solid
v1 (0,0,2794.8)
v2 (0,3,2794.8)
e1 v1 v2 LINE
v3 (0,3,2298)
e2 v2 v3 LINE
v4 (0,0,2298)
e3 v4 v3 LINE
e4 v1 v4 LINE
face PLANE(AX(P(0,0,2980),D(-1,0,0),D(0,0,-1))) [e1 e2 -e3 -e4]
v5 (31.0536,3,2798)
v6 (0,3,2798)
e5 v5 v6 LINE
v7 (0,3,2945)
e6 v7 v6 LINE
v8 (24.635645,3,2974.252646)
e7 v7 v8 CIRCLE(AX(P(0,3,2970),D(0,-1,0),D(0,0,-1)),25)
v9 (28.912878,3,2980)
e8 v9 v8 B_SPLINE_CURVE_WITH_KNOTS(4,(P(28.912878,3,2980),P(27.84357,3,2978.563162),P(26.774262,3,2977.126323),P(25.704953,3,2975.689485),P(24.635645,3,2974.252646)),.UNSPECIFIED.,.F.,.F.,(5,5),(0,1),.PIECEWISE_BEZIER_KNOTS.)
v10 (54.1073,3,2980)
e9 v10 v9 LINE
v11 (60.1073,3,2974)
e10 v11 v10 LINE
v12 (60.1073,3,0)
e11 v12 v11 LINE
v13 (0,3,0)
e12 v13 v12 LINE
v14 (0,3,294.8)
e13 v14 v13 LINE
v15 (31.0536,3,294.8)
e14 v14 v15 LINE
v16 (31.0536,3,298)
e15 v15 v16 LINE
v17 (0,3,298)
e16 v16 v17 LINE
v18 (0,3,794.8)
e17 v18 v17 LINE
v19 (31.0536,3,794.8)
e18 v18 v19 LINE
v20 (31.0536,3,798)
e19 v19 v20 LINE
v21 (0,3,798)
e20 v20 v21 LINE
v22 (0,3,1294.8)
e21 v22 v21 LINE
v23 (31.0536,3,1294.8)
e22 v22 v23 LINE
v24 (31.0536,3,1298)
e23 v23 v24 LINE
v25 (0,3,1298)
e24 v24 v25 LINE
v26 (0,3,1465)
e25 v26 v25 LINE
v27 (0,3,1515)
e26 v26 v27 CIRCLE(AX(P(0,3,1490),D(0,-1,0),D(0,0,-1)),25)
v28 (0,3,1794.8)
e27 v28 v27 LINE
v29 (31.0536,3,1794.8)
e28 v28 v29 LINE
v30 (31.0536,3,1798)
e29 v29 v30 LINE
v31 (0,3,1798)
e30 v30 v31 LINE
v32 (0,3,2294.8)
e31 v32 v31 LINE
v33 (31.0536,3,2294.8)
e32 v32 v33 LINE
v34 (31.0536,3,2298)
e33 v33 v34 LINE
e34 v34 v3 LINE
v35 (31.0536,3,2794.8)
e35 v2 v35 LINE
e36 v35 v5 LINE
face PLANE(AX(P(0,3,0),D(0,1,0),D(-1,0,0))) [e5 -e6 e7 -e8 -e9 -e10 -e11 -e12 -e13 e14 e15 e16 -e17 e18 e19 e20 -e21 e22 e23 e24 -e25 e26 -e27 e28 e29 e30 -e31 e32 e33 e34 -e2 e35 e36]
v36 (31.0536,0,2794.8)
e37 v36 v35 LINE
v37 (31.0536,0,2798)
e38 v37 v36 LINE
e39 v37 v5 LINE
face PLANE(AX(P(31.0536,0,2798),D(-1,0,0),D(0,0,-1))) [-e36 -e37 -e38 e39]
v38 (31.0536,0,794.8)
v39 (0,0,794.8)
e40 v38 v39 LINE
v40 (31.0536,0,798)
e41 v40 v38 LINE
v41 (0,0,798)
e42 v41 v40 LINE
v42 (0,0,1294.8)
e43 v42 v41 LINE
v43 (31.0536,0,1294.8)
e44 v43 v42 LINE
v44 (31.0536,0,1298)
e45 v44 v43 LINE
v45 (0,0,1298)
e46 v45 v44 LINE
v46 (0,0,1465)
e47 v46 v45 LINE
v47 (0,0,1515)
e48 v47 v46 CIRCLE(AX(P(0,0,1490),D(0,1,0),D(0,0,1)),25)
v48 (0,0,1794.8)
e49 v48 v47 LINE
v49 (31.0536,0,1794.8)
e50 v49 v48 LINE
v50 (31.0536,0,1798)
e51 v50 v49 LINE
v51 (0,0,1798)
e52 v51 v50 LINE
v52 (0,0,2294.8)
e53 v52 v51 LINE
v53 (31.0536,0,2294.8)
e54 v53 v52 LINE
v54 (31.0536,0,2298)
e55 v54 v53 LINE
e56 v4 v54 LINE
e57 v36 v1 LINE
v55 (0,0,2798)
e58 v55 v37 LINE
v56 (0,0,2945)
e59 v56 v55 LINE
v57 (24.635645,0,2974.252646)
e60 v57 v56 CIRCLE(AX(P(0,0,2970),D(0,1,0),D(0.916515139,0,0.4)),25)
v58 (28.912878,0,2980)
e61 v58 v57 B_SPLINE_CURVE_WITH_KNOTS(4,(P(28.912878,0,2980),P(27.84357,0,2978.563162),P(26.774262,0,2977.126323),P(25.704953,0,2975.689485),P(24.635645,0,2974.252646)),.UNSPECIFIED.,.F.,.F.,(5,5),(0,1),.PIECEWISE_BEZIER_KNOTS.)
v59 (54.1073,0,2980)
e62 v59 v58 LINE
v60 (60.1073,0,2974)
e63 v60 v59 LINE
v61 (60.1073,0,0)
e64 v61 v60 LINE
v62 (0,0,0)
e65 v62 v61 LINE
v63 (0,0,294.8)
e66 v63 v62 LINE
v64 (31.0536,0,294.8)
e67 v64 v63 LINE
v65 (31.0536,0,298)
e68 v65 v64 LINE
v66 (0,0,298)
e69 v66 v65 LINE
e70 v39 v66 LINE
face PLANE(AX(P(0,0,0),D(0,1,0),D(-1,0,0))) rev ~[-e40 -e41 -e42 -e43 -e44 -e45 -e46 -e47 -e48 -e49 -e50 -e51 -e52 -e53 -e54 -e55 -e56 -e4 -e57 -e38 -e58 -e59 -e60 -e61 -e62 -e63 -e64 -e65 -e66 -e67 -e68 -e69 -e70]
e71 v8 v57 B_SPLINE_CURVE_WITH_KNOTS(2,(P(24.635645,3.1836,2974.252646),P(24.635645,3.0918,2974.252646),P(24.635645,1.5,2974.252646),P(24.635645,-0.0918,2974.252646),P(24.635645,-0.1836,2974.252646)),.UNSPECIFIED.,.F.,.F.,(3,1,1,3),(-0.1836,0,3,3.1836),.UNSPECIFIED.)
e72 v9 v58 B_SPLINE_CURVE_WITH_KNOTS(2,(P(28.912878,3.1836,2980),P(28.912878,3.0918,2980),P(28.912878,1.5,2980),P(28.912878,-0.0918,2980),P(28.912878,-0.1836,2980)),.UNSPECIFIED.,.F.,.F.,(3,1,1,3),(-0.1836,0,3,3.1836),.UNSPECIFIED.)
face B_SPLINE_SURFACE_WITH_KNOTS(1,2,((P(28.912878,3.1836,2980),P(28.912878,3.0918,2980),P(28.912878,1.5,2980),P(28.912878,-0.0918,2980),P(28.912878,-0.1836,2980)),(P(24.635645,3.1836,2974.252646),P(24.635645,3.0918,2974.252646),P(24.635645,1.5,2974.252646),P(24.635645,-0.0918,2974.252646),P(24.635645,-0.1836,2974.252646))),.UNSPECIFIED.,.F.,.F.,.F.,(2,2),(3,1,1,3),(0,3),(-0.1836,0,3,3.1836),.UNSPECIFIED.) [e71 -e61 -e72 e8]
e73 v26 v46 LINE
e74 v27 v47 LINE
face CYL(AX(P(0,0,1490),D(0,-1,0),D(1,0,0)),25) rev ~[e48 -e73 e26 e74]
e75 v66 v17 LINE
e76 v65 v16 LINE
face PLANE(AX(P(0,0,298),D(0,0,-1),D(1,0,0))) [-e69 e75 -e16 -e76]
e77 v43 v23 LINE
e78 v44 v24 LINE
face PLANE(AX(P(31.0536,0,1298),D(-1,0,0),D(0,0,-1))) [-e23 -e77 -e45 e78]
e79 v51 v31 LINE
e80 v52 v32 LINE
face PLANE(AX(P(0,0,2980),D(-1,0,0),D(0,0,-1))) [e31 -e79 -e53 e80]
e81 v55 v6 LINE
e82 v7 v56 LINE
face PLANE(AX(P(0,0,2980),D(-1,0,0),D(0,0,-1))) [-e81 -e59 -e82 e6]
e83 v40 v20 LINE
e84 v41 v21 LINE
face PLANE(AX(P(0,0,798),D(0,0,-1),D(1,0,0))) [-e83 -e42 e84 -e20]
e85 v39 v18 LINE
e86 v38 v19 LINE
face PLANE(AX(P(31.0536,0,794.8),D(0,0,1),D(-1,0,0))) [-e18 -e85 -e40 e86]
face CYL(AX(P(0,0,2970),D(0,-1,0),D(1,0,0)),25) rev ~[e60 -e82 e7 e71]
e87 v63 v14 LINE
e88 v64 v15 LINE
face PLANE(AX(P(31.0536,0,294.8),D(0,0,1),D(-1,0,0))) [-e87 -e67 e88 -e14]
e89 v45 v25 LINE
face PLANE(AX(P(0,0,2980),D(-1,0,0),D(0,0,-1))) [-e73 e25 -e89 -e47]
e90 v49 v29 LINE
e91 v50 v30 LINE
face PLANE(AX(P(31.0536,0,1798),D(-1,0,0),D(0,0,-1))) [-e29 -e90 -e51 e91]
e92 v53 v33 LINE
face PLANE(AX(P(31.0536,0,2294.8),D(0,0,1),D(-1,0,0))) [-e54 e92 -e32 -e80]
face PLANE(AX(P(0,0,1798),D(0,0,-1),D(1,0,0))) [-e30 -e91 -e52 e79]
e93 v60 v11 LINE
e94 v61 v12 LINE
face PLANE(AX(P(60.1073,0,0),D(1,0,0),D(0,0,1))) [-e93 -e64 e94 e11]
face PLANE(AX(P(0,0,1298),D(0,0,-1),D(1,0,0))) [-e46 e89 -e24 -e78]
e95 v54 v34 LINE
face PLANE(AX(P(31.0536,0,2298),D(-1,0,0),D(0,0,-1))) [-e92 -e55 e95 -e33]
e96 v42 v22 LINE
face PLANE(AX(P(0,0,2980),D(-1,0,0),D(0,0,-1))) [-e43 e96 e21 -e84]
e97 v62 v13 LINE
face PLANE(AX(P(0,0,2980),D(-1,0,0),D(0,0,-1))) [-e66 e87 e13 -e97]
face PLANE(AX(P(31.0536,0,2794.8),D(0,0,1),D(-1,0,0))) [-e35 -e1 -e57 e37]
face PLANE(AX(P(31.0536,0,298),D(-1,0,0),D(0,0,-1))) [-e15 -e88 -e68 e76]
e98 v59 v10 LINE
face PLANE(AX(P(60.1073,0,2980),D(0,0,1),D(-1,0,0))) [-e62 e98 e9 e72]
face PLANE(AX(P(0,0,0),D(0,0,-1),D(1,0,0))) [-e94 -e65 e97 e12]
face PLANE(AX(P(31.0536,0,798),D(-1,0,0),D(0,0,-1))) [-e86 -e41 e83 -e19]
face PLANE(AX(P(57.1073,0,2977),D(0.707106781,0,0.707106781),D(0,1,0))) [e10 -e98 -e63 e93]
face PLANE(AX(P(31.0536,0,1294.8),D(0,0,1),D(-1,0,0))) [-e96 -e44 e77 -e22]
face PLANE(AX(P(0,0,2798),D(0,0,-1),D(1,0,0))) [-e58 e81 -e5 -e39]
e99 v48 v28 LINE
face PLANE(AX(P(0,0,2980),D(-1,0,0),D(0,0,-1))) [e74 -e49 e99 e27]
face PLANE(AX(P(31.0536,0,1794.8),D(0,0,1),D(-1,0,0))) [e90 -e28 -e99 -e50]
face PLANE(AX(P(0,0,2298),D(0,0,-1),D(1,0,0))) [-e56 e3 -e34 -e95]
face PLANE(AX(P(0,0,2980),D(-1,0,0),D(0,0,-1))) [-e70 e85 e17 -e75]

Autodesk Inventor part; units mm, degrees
ref_plane "YZ Plane" through (0, 0, 0) normal (1, 0, 0) x (0, 1, 0)
ref_plane "XZ Plane" through (0, 0, 0) normal (0, 1, 0) x (-1, 0, 0)
ref_plane "XY Plane" through (0, 0, 0) normal (0, 0, 1) x (1, 0, 0)
sketch "Sketch6" plane through (0, 0, 0) normal (0, 1, 0) x (-1, 0, 0)
  line L0 (0, 0) -> (-60.1073, 0)
  line L1 (-60.1073, 0) -> (-60.1073, 2980)
  line L2 (-60.1073, 2980) -> (0, 2980)
  line L3 (0, 2980) -> (0, 0)
  dimension "d26" = 60.1073
  dimension "d27" = 2980
extrude "Plate4" add sketch "Sketch6" along normal blind 3
sketch "Sketch9" plane through (0, 3, 0) normal (0, 1, 0) x (1, 0, 0)
  line L0 (0, -2980) -> (0, 0) projected
  line L1 (60.1073, -2980) -> (0, -2980) projected
  line L2 (60.1073, 0) -> (60.1073, -2980) projected
  line L3 (0, 0) -> (60.1073, 0) projected
  line L4 (25, -2762.0797) -> (10, -2762.0797) construction
  line L5 (10, -2762.0797) -> (10, -2562.0797) construction
  line L6 (10, -2562.0797) -> (25, -2562.0797) construction
  line L7 (25, -2562.0797) -> (25, -2762.0797) construction
  dimension "d44" = 200
  dimension "d45" = 15
  dimension "d47" = 10
mark "Mark1"
sketch "Sketch7" plane through (0, 0, 0) normal (0, -1, 0) x (1, 0, 0)
  line L0 (0, 2980) -> (60.1073, 2980) projected
  line L1 (0, 0) -> (0, 2980) projected
  line L2 (60.1073, 0) -> (0, 0) projected
  line L3 (60.1073, 2980) -> (60.1073, 0) projected
  line L4 (0, 2798) -> (31.0536, 2798)
  line L5 (31.0536, 2798) -> (31.0536, 2794.8)
  line L6 (31.0536, 2794.8) -> (0, 2794.8)
  line L7 (0, 2794.8) -> (0, 2798)
  point P0 (0, 2794.8)
  point P1 (0, 200)
  point P2 (46.4173, 200)
  point P3 (0, 2794.8)
  dimension "d29" = 31.0536
  dimension "d30" = 3.2
  dimension "d51" = 182
extrude "Extrusion2" cut sketch "Sketch7" against normal through all contours L4 L5 L6 L1
pattern_linear "Rectangular Pattern1" count 6 spacing 500 along (0, 0, -1) of "Extrusion2"
sketch "Sketch8" plane through (0, 0, 0) normal (0, -1, 0) x (1, 0, 0)
  line L0 (0, 2798) -> (31.0536, 2798) projected
  line L1 (31.0536, 2798) -> (31.0536, 2794.8) projected
  line L2 (31.0536, 2794.8) -> (0, 2794.8) projected
  line L3 (0, 0) -> (0, 294.8) projected
  line L4 (60.1073, 0) -> (0, 0) projected
  line L5 (60.1073, 2980) -> (60.1073, 0) projected
  line L6 (0, 2980) -> (60.1073, 2980) projected
  circle A0 centre (0, 1490) radius 25
  line L7 (0, 2798) -> (0, 2980) projected
  line L8 (0, 298) -> (31.0536, 298) projected
  line L9 (31.0536, 298) -> (31.0536, 294.8) projected
  line L10 (31.0536, 294.8) -> (0, 294.8) projected
  line L11 (0, 2298) -> (0, 2794.8) projected
  line L12 (0, 2298) -> (31.0536, 2298) projected
  line L13 (31.0536, 2298) -> (31.0536, 2294.8) projected
  line L14 (31.0536, 2294.8) -> (0, 2294.8) projected
  line L15 (0, 1798) -> (0, 2294.8) projected
  line L16 (0, 1798) -> (31.0536, 1798) projected
  line L17 (31.0536, 1798) -> (31.0536, 1794.8) projected
  line L18 (31.0536, 1794.8) -> (0, 1794.8) projected
  line L19 (0, 1298) -> (0, 1794.8) projected
  line L20 (0, 1298) -> (31.0536, 1298) projected
  line L21 (31.0536, 1298) -> (31.0536, 1294.8) projected
  line L22 (31.0536, 1294.8) -> (0, 1294.8) projected
  line L23 (0, 798) -> (0, 1294.8) projected
  line L24 (0, 798) -> (31.0536, 798) projected
  line L25 (31.0536, 798) -> (31.0536, 794.8) projected
  line L26 (31.0536, 794.8) -> (0, 794.8) projected
  line L27 (0, 298) -> (0, 794.8) projected
  dimension "d37" = 50
  dimension "d38" = 1490
extrude "Extrusion3" cut sketch "Sketch8" against normal through all contours L19 A0 | A0 L19
pattern_linear "Rectangular Pattern2" count 2 spacing 1480 along (0, 0, 1) of "Extrusion3"
chamfer "Corner Chamfer1" distance 6 angle 45 2 edges at (22.9129, 1.5, 2980) (60.1073, 1.5, 2980)
equation "\"d26\" = Stringer4_deep"
equation "\"d28\" = Thickness"
equation "\"BendReliefWidth\" = Thickness"
equation "\"BendReliefDepth\" = 0.5 * Thickness"
equation "\"CornerReliefSize\" = 4 * Thickness"
equation "\"MinimumRemnant\" = 2 * Thickness"
equation "\"TransitionRadius\" = BendRadius"
equation "\"JacobiRadiusSize\" = BendRadius"
equation "\"GapSize\" = Thickness"
equation "\"Stringer4_deep\" = 60.107271"
equation "\"Thickness\" = 3"
equation "\"BendRadius\" = 5"
properties part number "BSH 0361 stringer board 4" material "09g2s"
